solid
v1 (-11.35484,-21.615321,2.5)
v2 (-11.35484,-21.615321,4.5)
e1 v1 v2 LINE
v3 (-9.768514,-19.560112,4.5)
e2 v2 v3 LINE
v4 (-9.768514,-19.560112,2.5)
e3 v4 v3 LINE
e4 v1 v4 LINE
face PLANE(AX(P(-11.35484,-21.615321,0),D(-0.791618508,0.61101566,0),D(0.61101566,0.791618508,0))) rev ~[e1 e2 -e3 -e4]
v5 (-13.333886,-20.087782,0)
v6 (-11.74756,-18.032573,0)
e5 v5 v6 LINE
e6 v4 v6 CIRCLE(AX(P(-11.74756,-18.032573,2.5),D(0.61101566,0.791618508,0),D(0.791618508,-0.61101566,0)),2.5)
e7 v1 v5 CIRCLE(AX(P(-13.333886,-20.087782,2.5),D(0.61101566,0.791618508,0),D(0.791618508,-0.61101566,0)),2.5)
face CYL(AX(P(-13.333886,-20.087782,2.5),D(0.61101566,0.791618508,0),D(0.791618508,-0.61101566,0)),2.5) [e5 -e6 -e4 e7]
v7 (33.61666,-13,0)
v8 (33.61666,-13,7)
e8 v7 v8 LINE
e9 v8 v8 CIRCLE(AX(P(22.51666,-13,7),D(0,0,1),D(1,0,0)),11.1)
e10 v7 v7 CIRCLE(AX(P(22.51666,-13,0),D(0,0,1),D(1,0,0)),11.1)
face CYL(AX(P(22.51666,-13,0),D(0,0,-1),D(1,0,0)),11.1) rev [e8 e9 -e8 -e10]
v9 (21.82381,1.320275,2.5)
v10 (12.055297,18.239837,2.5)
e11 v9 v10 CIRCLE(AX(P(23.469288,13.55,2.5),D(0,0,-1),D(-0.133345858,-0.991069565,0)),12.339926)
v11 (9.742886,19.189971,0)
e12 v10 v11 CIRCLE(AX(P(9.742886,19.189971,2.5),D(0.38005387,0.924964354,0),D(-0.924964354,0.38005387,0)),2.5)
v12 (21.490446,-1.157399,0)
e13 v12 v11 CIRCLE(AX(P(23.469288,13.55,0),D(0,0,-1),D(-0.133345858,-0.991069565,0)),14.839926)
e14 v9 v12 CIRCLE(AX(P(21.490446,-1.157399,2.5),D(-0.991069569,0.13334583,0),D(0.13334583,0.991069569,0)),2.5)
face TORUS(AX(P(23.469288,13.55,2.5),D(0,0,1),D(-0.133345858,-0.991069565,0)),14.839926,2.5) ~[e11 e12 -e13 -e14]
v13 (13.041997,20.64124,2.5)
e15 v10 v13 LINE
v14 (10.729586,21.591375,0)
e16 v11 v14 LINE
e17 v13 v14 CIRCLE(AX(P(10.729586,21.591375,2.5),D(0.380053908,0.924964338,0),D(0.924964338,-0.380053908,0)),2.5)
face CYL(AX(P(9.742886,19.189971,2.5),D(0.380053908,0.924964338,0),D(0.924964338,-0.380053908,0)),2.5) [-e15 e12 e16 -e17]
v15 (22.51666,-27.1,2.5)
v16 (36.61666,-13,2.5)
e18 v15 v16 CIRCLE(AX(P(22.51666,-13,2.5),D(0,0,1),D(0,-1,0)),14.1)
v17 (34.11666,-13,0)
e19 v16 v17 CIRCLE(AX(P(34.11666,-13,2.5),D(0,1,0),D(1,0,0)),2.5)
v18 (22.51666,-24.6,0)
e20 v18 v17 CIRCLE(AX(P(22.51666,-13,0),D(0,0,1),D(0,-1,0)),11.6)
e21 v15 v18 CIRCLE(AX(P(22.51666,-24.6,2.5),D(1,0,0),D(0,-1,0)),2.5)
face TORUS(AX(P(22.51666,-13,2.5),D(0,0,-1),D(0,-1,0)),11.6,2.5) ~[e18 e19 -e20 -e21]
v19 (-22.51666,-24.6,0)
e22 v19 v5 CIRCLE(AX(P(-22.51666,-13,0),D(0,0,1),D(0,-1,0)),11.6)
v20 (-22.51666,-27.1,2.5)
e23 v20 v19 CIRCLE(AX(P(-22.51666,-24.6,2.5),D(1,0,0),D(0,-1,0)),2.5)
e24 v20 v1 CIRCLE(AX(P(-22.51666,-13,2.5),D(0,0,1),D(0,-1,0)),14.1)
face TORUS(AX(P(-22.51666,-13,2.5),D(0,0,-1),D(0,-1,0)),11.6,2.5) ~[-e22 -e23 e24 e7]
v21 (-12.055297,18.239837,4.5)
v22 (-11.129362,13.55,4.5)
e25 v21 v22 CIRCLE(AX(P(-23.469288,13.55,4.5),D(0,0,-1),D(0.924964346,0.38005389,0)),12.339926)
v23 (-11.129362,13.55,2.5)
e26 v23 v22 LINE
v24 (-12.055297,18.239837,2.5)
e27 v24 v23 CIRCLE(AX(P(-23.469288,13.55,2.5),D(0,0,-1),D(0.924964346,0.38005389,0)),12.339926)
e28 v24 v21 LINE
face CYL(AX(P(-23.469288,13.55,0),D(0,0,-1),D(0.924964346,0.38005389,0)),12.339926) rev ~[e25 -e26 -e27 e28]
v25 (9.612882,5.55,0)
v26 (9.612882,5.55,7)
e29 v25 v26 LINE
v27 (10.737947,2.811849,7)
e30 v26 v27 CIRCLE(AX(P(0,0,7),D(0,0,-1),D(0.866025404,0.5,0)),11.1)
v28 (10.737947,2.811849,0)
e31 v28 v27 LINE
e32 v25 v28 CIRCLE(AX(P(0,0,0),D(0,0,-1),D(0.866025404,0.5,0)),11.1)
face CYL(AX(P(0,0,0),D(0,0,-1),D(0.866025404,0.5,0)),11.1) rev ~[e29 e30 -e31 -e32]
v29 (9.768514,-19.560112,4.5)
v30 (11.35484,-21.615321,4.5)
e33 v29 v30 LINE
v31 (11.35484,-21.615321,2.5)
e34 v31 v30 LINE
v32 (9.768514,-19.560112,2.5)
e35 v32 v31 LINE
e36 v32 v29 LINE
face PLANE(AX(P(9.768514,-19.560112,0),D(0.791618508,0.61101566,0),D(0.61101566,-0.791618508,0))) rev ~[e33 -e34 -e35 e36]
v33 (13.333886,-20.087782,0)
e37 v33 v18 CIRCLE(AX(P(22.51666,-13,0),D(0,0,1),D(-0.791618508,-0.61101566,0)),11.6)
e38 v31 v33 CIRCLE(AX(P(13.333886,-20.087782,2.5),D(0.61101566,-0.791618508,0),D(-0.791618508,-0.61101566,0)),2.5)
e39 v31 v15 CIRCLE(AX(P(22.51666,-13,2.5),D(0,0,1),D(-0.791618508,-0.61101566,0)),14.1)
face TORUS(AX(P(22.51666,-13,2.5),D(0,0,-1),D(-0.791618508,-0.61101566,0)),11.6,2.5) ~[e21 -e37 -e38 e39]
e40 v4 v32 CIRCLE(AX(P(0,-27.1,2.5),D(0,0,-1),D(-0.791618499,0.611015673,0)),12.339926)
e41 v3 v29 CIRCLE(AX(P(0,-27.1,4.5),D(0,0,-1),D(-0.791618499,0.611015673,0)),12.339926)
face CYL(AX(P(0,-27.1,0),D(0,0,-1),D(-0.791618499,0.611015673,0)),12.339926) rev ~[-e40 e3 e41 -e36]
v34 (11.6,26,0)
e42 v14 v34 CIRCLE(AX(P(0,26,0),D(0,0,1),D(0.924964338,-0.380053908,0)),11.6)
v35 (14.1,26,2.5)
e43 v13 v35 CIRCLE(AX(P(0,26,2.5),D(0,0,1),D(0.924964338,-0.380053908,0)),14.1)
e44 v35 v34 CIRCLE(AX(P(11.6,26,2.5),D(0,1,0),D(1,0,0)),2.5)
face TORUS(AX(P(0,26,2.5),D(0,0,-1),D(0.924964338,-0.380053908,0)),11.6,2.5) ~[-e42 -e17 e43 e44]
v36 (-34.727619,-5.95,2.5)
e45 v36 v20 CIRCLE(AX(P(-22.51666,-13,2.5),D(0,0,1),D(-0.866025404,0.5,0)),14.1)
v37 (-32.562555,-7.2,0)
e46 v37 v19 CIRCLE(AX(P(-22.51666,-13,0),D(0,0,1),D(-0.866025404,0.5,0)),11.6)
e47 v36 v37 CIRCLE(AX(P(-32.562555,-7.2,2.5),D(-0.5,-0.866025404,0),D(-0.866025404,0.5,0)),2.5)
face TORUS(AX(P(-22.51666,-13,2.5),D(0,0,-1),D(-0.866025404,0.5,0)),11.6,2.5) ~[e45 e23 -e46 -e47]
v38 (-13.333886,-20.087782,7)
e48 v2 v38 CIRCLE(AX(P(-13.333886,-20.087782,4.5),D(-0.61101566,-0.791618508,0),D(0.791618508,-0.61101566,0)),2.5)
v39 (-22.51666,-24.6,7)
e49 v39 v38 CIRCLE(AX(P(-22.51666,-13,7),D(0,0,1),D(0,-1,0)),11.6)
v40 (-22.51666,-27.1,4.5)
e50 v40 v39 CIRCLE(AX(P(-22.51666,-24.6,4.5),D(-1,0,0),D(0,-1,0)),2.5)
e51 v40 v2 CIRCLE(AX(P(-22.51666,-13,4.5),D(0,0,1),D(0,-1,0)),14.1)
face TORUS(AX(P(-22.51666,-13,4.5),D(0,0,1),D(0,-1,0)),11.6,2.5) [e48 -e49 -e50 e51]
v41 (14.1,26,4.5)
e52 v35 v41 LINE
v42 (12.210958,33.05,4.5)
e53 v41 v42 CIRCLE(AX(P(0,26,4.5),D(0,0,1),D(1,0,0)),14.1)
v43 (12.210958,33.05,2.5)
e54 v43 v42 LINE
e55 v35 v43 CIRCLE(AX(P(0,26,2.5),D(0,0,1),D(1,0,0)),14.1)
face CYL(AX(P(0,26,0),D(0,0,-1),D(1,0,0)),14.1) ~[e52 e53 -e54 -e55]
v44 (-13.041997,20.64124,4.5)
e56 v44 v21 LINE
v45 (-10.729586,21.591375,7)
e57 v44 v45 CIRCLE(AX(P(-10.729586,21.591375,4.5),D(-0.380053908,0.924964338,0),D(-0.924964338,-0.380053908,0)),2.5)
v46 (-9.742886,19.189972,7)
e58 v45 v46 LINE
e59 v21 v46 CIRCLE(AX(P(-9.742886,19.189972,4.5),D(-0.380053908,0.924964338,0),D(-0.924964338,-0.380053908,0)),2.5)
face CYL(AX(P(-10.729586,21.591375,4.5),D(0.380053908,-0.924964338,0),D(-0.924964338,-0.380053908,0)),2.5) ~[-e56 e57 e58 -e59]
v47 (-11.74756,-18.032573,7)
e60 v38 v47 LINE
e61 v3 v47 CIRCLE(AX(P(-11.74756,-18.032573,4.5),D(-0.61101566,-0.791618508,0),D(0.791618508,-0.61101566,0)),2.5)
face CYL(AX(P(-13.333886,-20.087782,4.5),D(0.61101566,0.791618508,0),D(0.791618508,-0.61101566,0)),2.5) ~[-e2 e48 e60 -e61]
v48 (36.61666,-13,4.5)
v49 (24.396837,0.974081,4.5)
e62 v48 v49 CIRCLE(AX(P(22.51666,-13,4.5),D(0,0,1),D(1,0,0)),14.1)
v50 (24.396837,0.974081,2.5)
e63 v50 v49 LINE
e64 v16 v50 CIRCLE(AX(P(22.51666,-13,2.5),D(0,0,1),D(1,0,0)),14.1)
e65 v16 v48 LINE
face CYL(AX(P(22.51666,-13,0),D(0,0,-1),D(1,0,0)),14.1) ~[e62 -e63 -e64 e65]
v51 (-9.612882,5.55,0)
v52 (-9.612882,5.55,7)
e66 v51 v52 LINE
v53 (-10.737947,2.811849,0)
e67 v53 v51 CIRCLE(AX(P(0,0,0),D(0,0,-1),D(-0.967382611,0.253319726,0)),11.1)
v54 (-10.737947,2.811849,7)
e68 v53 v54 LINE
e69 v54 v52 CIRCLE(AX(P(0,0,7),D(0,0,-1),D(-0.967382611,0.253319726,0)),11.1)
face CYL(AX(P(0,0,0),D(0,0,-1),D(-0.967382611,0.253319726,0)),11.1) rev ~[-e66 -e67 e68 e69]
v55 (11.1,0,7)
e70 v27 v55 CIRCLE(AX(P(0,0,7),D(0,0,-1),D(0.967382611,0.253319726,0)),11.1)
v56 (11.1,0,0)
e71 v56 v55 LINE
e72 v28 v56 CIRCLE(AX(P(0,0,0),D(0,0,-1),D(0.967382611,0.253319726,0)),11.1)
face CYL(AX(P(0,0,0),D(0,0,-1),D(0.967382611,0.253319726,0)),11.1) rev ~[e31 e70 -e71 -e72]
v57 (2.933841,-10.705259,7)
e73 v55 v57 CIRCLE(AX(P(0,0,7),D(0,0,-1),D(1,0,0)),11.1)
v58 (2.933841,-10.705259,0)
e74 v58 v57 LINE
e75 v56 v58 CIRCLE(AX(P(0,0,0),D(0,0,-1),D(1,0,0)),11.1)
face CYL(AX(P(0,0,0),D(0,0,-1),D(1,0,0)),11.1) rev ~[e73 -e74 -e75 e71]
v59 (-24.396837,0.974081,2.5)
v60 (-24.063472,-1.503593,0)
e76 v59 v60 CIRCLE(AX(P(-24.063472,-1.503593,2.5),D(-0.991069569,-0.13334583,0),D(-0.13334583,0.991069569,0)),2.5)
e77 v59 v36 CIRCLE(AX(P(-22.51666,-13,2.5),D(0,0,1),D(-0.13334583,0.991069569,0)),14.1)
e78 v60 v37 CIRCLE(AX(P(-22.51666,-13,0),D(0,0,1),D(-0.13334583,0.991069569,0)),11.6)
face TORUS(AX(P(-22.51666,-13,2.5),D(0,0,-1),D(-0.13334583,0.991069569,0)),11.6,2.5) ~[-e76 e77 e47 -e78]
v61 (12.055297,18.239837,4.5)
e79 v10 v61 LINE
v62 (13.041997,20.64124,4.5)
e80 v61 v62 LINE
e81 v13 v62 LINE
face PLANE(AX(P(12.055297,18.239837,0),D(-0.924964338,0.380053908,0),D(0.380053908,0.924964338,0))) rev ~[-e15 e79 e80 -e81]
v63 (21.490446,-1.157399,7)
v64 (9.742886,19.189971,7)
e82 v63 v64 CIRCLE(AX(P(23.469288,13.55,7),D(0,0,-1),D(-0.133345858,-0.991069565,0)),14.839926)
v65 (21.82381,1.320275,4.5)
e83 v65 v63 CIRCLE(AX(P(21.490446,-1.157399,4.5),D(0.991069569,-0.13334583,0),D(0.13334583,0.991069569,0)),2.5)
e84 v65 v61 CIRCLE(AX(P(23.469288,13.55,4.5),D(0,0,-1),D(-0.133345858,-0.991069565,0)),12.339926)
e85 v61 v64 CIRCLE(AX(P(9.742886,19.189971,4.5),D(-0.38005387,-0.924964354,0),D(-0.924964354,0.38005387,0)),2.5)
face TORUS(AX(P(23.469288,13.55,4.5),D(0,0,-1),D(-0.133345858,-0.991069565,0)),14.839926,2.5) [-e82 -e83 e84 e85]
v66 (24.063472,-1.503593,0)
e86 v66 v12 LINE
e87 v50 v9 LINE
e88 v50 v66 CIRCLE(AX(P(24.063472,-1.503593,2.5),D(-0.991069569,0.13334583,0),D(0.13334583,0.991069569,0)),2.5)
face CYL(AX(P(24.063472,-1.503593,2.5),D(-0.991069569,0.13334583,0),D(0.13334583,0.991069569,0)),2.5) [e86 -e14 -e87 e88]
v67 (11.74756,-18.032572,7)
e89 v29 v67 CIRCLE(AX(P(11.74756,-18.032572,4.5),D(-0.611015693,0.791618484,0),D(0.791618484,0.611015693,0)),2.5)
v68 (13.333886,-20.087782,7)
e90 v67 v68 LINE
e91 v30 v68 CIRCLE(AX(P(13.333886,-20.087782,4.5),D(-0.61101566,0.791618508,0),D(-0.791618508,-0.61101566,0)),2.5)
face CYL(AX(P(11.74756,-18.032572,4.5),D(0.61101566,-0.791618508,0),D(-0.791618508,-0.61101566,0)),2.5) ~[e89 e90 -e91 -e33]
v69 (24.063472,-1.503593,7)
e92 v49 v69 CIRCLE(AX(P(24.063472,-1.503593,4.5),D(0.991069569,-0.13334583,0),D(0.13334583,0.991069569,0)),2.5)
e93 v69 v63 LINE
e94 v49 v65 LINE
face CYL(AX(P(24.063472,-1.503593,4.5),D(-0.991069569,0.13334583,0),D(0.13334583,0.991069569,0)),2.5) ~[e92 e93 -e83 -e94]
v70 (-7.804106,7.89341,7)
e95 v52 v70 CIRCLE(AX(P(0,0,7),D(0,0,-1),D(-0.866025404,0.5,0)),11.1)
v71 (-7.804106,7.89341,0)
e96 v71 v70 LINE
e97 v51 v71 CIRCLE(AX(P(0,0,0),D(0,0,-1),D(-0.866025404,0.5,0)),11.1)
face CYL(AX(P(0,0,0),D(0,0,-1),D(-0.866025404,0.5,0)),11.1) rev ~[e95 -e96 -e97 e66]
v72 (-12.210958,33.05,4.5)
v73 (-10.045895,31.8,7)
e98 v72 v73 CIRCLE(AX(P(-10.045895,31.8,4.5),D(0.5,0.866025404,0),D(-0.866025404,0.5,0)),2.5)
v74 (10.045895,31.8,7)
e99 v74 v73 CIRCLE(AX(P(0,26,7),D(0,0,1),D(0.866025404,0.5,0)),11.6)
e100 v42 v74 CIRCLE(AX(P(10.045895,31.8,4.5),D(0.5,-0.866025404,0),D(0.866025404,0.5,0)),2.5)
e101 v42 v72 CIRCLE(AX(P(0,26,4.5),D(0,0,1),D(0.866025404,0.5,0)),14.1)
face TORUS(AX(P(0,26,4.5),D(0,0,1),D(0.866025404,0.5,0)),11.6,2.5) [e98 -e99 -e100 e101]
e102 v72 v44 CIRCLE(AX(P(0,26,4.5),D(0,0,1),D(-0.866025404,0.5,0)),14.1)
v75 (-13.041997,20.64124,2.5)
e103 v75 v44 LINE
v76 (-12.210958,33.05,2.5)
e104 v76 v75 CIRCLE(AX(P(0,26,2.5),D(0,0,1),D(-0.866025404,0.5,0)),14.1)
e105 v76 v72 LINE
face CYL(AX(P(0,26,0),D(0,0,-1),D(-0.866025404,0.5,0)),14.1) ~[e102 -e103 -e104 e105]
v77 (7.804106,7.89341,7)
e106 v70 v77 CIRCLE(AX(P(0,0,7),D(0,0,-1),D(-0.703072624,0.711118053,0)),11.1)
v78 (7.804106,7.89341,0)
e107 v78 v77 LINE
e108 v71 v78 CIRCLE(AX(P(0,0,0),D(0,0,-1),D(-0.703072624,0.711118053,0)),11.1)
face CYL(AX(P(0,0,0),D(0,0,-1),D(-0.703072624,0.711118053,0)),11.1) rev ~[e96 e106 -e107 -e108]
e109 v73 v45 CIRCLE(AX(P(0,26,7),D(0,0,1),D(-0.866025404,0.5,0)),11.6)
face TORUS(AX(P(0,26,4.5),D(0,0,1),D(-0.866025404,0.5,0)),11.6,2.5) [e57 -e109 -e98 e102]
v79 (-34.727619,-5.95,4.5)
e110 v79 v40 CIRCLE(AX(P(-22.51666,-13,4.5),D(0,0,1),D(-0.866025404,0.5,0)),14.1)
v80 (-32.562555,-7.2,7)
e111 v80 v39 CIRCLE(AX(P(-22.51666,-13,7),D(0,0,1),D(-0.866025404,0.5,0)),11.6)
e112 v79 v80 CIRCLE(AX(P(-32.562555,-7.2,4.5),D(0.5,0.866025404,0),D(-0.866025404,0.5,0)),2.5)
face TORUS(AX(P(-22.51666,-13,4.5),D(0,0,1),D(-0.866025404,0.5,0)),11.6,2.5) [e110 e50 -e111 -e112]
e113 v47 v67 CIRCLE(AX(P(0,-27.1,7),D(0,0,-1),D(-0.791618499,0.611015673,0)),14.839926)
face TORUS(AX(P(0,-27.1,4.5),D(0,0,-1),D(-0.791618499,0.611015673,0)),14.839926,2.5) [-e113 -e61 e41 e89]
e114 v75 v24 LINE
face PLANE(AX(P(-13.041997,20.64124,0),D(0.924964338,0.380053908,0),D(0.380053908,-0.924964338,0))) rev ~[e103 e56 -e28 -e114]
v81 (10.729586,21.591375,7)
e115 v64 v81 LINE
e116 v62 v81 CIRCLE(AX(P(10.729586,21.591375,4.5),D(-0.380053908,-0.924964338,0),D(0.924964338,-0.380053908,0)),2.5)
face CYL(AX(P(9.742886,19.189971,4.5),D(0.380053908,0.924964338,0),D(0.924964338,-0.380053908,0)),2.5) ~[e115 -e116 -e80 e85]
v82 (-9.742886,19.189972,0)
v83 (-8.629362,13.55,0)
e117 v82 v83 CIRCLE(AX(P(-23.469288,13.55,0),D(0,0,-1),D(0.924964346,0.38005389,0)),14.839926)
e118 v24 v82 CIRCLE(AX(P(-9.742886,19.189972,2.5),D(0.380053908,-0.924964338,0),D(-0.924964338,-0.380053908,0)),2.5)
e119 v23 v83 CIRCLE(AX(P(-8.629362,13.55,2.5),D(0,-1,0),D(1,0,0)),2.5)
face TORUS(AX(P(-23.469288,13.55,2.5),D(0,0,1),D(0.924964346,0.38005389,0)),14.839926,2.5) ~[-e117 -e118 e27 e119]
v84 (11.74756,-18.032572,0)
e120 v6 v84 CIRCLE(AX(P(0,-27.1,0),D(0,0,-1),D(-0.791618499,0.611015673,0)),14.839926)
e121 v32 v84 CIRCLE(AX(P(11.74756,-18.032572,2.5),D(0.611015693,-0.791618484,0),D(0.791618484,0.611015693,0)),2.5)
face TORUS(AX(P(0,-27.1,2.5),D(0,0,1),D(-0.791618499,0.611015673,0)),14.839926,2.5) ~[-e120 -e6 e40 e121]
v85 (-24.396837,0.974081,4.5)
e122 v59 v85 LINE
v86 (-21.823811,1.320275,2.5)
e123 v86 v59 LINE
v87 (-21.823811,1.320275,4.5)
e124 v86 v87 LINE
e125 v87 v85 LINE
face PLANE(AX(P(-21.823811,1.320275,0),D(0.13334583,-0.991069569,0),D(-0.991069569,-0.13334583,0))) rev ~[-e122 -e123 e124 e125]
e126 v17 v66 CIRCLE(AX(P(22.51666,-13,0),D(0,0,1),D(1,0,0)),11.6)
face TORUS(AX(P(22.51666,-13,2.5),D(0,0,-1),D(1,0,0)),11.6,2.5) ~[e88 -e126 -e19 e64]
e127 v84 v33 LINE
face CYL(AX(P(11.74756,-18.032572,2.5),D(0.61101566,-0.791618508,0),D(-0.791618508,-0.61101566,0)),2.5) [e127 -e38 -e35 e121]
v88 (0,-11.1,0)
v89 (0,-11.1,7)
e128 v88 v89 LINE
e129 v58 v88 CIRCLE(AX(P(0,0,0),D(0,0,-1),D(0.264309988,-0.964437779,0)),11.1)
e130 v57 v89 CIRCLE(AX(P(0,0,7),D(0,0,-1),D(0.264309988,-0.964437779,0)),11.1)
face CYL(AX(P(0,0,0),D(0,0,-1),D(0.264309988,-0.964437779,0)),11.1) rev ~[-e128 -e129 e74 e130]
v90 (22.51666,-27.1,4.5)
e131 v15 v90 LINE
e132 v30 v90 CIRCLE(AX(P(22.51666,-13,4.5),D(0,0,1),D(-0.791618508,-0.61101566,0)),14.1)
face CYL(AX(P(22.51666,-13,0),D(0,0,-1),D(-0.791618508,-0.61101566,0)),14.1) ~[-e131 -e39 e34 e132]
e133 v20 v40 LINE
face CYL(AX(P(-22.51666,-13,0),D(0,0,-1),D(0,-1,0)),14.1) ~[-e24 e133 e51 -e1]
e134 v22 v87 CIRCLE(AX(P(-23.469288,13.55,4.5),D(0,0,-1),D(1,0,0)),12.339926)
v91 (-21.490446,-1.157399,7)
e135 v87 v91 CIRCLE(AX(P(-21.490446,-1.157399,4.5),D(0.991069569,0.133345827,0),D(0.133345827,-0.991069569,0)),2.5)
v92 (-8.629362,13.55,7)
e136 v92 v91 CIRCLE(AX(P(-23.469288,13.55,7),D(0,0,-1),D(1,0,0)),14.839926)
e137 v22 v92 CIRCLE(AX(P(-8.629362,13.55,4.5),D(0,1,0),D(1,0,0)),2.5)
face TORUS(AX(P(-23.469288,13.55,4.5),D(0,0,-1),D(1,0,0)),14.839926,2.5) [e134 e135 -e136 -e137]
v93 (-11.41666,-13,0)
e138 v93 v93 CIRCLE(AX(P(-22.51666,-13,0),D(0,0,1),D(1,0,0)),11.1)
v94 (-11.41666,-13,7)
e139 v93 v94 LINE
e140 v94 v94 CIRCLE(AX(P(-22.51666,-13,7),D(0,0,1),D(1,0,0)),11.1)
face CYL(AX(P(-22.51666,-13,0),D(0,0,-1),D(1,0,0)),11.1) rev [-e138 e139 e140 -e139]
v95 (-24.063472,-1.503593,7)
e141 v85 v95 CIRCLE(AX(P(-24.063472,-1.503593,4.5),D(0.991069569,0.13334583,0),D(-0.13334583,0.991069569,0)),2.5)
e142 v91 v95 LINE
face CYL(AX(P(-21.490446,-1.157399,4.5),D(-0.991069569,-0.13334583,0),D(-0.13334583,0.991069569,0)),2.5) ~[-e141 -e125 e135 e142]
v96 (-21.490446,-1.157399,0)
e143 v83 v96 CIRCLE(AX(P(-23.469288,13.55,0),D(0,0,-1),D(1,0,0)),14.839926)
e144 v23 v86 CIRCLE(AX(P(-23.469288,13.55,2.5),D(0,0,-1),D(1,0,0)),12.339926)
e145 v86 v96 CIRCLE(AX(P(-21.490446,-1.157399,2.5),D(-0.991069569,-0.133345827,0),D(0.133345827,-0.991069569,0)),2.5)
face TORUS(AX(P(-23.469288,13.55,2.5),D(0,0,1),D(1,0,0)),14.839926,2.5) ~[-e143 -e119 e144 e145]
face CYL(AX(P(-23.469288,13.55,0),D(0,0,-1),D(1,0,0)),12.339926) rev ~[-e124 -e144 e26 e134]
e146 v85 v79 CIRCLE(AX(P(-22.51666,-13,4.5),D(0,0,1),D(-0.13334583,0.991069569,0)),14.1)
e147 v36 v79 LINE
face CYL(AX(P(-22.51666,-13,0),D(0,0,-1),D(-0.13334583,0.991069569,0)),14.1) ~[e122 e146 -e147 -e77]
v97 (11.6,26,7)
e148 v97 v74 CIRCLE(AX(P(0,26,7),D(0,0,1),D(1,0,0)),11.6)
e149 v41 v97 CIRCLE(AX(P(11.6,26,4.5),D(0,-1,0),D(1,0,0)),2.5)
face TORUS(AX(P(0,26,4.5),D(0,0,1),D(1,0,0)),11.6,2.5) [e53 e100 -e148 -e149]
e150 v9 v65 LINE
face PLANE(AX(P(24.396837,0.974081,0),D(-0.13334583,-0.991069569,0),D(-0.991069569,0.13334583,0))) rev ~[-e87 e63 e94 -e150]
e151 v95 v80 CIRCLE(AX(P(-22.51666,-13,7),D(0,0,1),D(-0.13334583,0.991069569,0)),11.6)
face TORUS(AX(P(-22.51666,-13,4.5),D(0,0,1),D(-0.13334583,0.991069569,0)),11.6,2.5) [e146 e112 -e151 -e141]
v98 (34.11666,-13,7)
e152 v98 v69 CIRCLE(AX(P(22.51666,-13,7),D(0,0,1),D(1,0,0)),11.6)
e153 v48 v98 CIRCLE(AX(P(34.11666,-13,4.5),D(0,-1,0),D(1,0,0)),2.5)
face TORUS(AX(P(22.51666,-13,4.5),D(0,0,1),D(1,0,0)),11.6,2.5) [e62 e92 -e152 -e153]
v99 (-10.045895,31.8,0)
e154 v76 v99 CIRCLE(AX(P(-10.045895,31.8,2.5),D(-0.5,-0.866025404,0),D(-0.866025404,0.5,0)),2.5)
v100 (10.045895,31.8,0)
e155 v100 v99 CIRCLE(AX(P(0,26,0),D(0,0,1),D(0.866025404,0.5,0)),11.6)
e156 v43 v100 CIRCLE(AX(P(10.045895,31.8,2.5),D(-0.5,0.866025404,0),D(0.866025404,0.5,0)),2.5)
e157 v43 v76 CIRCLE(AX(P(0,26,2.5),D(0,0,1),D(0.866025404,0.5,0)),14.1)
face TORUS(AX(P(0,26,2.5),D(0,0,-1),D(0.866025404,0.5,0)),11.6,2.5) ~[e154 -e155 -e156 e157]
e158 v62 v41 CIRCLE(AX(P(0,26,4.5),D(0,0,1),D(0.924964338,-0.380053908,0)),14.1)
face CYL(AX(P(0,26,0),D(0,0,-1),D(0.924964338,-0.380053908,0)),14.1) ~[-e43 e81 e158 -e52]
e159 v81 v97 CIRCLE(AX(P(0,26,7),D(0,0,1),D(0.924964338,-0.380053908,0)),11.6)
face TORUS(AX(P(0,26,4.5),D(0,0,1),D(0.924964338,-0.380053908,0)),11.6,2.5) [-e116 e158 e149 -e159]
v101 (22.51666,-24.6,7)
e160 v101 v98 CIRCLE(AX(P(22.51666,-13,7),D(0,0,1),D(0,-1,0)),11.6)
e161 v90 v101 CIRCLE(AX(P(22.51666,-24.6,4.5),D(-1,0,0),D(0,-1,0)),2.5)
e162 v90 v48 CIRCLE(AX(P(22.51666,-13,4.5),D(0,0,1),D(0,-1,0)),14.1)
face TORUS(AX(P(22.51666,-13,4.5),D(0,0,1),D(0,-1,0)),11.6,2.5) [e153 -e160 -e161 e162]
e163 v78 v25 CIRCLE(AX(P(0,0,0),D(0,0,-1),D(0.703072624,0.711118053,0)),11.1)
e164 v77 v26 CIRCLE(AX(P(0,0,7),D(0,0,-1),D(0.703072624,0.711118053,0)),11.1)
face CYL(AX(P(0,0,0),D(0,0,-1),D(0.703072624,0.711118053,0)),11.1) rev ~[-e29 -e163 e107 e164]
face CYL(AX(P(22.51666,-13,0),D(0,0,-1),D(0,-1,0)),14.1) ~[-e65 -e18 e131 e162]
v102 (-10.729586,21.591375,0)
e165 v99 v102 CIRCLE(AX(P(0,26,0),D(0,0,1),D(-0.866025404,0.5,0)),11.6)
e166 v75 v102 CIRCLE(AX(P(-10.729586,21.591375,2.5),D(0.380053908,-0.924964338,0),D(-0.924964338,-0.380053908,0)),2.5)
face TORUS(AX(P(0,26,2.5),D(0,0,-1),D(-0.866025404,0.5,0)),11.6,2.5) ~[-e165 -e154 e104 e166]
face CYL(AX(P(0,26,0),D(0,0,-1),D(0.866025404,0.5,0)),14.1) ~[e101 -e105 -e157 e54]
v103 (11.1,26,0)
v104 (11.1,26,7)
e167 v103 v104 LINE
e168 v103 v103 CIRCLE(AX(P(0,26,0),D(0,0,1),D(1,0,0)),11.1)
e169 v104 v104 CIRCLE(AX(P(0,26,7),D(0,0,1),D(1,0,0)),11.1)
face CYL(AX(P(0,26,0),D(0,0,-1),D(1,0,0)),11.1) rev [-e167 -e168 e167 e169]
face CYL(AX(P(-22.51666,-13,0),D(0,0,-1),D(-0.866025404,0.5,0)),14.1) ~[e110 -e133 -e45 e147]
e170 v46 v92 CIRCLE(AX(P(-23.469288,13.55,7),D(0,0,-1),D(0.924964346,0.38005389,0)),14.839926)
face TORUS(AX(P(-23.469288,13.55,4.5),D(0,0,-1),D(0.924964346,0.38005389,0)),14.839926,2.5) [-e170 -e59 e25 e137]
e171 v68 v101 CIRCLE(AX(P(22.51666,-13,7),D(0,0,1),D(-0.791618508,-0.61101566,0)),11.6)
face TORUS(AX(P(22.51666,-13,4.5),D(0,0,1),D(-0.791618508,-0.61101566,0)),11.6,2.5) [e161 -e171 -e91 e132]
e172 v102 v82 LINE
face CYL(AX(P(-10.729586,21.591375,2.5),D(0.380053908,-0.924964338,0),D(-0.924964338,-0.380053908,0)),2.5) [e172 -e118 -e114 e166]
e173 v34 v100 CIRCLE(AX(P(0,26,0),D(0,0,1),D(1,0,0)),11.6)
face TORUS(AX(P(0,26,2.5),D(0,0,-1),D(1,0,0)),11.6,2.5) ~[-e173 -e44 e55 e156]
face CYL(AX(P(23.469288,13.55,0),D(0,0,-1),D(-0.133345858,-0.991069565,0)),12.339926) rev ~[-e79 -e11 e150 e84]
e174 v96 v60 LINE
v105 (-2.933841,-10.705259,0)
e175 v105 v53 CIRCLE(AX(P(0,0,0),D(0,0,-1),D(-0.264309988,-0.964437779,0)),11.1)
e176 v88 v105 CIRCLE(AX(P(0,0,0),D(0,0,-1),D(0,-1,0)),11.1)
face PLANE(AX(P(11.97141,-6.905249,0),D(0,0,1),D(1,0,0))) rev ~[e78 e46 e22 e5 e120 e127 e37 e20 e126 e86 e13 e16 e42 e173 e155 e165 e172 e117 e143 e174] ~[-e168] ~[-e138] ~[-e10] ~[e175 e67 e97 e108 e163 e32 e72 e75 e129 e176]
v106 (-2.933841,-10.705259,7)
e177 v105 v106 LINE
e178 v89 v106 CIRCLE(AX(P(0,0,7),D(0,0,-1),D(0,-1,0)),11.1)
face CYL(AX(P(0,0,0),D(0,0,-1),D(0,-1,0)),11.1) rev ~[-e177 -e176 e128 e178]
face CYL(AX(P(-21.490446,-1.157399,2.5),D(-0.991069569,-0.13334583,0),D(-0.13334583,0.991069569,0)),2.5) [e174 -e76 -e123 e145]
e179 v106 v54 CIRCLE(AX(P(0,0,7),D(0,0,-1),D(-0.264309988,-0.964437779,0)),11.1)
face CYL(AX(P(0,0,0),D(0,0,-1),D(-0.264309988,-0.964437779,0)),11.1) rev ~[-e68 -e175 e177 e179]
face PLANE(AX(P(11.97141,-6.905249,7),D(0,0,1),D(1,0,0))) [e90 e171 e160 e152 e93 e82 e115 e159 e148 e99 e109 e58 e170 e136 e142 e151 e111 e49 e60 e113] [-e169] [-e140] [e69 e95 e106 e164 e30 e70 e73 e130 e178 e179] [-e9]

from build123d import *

# Parameters (mm, degrees)
F0_R     = 11.1
F1_DEPTH = 7
F2_R     = 2.5


with BuildPart() as f1:
    # F0 (on Top) → F1 (new body)
    with BuildSketch(Plane.XY):
        with BuildLine():
            ThreePointArc((10.7379469842, 2.8118489582), (11.0091146675, 1.4175310358), (11.1, 0))
            ThreePointArc((11.1, 0), (8.8254074573, -6.7321752214), (2.9338408627, -10.705259352))
            Line((2.9338408627, -10.705259352), (9.7685135139, -19.5601115638))
            Line((9.7685135139, -19.5601115638), (11.3548395287, -21.6153208089))
            ThreePointArc((11.3548395287, -21.6153208089), (10.305702305, -5.95), (24.3968366958, 0.9740809167))
            Line((24.3968366958, 0.9740809167), (21.8238104233, 1.3202749012))
            Line((21.8238104233, 1.3202749012), (10.7379469842, 2.8118489582))
        make_face()
        with BuildLine():
            ThreePointArc((9.612881982, 5.55), (10.2671041528, 4.2185983827), (10.7379469842, 2.8118489582))
            Line((10.7379469842, 2.8118489582), (21.8238104233, 1.3202749012))
            ThreePointArc((21.8238104233, 1.3202749012), (12.7825990769, 7.3800369283), (12.0552967571, 18.2398366397))
            Line((12.0552967571, 18.2398366397), (7.8041061216, 7.8934103937))
            ThreePointArc((7.8041061216, 7.8934103937), (8.7869654442, 6.7822738283), (9.612881982, 5.55))
        make_face()
        with BuildLine():
            Line((9.7685135139, -19.5601115638), (2.9338408627, -10.705259352))
            ThreePointArc((2.9338408627, -10.705259352), (1.4801387086, -11.000872211), (0, -11.1))
            ThreePointArc((0, -11.1), (-1.4801387086, -11.000872211), (-2.9338408627, -10.705259352))
            Line((-2.9338408627, -10.705259352), (-9.7685137049, -19.5601118111))
            ThreePointArc((-9.7685137049, -19.5601118111), (-1.562e-07, -14.7600739912), (9.7685135139, -19.5601115638))
        make_face()
        with BuildLine():
            ThreePointArc((-7.8041061216, 7.8934103937), (0, 11.1), (7.8041061216, 7.8934103937))
            Line((7.8041061216, 7.8934103937), (12.0552967571, 18.2398366397))
            Line((12.0552967571, 18.2398366397), (13.0419971671, 20.6412398922))
            ThreePointArc((13.0419971671, 20.6412398922), (0, 11.9), (-13.0419971671, 20.6412398922))
            Line((-13.0419971671, 20.6412398922), (-12.0552968552, 18.2398368784))
            Line((-12.0552968552, 18.2398368784), (-7.8041061216, 7.8934103937))
        make_face()
        with BuildLine():
            ThreePointArc((34.7276186918, -5.95), (30.3668669441, -1.2874315899), (24.3968366958, 0.9740809167))
            ThreePointArc((24.3968366958, 0.9740809167), (10.305702305, -5.95), (11.3548395287, -21.6153208089))
            ThreePointArc((11.3548395287, -21.6153208089), (16.2983819346, -25.6547624119), (22.5166604984, -27.1))
            ThreePointArc((22.5166604984, -27.1), (32.4868661131, -22.9702056147), (36.6166604984, -13))
            ThreePointArc((36.6166604984, -13), (36.1362146491, -9.3506514641), (34.7276186918, -5.95))
        make_face()
        with Locations((22.5166604984, -13)):
            Circle(F0_R, mode=Mode.SUBTRACT)
        with BuildLine():
            Line((-9.7685137049, -19.5601118111), (-2.9338408627, -10.705259352))
            ThreePointArc((-2.9338408627, -10.705259352), (-9.612881982, -5.55), (-10.7379469842, 2.8118489582))
            Line((-10.7379469842, 2.8118489582), (-21.8238108007, 1.3202748505))
            Line((-21.8238108007, 1.3202748505), (-24.3968366958, 0.9740809167))
            ThreePointArc((-24.3968366958, 0.9740809167), (-13.2349711151, -2.3858470808), (-8.4166604984, -13))
            ThreePointArc((-8.4166604984, -13), (-9.1714052428, -17.551281376), (-11.3548395287, -21.6153208089))
            Line((-11.3548395287, -21.6153208089), (-9.7685137049, -19.5601118111))
        make_face()
        with BuildLine():
            ThreePointArc((-9.612881982, 5.55), (-8.7869654442, 6.7822738283), (-7.8041061216, 7.8934103937))
            Line((-7.8041061216, 7.8934103937), (-12.0552968552, 18.2398368784))
            ThreePointArc((-12.0552968552, 18.2398368784), (-11.3630589396, 15.9401843286), (-11.1293624337, 13.55))
            ThreePointArc((-11.1293624337, 13.55), (-14.1800784048, 5.4269247956), (-21.8238108007, 1.3202748505))
            Line((-21.8238108007, 1.3202748505), (-10.7379469842, 2.8118489582))
            ThreePointArc((-10.7379469842, 2.8118489582), (-10.2671041528, 4.2185983827), (-9.612881982, 5.55))
        make_face()
        with BuildLine():
            ThreePointArc((-13.0419971671, 20.6412398922), (0, 11.9), (13.0419971671, 20.6412398922))
            ThreePointArc((13.0419971671, 20.6412398922), (13.8329707593, 23.2688976636), (14.1, 26))
            ThreePointArc((14.1, 26), (13.6195541507, 29.6493485359), (12.2109581934, 33.05))
            ThreePointArc((12.2109581934, 33.05), (0, 40.1), (-12.2109581934, 33.05))
            ThreePointArc((-12.2109581934, 33.05), (-14.0684850095, 26.9421940019), (-13.0419971671, 20.6412398922))
        make_face()
        with Locations((0, 26)):
            Circle(F0_R, mode=Mode.SUBTRACT)
        with BuildLine():
            ThreePointArc((-22.5166604984, -27.1), (-16.2983819346, -25.6547624119), (-11.3548395287, -21.6153208089))
            ThreePointArc((-11.3548395287, -21.6153208089), (-9.1714052428, -17.551281376), (-8.4166604984, -13))
            ThreePointArc((-8.4166604984, -13), (-13.2349711151, -2.3858470808), (-24.3968366958, 0.9740809167))
            ThreePointArc((-24.3968366958, 0.9740809167), (-30.3668669441, -1.2874315899), (-34.7276186918, -5.95))
            ThreePointArc((-34.7276186918, -5.95), (-34.7276186918, -20.05), (-22.5166604984, -27.1))
        make_face()
        with Locations((-22.5166604984, -13)):
            Circle(F0_R, mode=Mode.SUBTRACT)
    extrude(amount=F1_DEPTH)

    # F2
    f2_edges = [f1.edges().sort_by_distance(p)[0] for p in [
        (-34.727619, -20.05, 7),
        (-34.727619, -20.05, 0),
        (10.561677, -20.587716, 0),
        (10.561677, -20.587716, 7),
        (34.727619, -20.05, 0),
        (34.727619, -20.05, 7),
        (23.110324, 1.147178, 0),
        (23.110324, 1.147178, 7),
        (12.782599, 7.380037, 0),
        (12.782599, 7.380037, 7),
        (12.548647, 19.440538, 0),
        (12.548647, 19.440538, 7),
        (0, 40.1, 0),
        (0, 40.1, 7),
        (-12.548647, 19.440538, 0),
        (-12.548647, 19.440538, 7),
        (-12.782599, 7.380037, 0),
        (-12.782599, 7.380037, 7),
        (-23.110324, 1.147178, 0),
        (-23.110324, 1.147178, 7),
        (-10.561677, -20.587716, 0),
        (-10.561677, -20.587716, 7),
        (0, -14.760074, 0),
        (0, -14.760074, 7),
    ]]
    fillet(f2_edges, radius=F2_R)


solid = f1.part
